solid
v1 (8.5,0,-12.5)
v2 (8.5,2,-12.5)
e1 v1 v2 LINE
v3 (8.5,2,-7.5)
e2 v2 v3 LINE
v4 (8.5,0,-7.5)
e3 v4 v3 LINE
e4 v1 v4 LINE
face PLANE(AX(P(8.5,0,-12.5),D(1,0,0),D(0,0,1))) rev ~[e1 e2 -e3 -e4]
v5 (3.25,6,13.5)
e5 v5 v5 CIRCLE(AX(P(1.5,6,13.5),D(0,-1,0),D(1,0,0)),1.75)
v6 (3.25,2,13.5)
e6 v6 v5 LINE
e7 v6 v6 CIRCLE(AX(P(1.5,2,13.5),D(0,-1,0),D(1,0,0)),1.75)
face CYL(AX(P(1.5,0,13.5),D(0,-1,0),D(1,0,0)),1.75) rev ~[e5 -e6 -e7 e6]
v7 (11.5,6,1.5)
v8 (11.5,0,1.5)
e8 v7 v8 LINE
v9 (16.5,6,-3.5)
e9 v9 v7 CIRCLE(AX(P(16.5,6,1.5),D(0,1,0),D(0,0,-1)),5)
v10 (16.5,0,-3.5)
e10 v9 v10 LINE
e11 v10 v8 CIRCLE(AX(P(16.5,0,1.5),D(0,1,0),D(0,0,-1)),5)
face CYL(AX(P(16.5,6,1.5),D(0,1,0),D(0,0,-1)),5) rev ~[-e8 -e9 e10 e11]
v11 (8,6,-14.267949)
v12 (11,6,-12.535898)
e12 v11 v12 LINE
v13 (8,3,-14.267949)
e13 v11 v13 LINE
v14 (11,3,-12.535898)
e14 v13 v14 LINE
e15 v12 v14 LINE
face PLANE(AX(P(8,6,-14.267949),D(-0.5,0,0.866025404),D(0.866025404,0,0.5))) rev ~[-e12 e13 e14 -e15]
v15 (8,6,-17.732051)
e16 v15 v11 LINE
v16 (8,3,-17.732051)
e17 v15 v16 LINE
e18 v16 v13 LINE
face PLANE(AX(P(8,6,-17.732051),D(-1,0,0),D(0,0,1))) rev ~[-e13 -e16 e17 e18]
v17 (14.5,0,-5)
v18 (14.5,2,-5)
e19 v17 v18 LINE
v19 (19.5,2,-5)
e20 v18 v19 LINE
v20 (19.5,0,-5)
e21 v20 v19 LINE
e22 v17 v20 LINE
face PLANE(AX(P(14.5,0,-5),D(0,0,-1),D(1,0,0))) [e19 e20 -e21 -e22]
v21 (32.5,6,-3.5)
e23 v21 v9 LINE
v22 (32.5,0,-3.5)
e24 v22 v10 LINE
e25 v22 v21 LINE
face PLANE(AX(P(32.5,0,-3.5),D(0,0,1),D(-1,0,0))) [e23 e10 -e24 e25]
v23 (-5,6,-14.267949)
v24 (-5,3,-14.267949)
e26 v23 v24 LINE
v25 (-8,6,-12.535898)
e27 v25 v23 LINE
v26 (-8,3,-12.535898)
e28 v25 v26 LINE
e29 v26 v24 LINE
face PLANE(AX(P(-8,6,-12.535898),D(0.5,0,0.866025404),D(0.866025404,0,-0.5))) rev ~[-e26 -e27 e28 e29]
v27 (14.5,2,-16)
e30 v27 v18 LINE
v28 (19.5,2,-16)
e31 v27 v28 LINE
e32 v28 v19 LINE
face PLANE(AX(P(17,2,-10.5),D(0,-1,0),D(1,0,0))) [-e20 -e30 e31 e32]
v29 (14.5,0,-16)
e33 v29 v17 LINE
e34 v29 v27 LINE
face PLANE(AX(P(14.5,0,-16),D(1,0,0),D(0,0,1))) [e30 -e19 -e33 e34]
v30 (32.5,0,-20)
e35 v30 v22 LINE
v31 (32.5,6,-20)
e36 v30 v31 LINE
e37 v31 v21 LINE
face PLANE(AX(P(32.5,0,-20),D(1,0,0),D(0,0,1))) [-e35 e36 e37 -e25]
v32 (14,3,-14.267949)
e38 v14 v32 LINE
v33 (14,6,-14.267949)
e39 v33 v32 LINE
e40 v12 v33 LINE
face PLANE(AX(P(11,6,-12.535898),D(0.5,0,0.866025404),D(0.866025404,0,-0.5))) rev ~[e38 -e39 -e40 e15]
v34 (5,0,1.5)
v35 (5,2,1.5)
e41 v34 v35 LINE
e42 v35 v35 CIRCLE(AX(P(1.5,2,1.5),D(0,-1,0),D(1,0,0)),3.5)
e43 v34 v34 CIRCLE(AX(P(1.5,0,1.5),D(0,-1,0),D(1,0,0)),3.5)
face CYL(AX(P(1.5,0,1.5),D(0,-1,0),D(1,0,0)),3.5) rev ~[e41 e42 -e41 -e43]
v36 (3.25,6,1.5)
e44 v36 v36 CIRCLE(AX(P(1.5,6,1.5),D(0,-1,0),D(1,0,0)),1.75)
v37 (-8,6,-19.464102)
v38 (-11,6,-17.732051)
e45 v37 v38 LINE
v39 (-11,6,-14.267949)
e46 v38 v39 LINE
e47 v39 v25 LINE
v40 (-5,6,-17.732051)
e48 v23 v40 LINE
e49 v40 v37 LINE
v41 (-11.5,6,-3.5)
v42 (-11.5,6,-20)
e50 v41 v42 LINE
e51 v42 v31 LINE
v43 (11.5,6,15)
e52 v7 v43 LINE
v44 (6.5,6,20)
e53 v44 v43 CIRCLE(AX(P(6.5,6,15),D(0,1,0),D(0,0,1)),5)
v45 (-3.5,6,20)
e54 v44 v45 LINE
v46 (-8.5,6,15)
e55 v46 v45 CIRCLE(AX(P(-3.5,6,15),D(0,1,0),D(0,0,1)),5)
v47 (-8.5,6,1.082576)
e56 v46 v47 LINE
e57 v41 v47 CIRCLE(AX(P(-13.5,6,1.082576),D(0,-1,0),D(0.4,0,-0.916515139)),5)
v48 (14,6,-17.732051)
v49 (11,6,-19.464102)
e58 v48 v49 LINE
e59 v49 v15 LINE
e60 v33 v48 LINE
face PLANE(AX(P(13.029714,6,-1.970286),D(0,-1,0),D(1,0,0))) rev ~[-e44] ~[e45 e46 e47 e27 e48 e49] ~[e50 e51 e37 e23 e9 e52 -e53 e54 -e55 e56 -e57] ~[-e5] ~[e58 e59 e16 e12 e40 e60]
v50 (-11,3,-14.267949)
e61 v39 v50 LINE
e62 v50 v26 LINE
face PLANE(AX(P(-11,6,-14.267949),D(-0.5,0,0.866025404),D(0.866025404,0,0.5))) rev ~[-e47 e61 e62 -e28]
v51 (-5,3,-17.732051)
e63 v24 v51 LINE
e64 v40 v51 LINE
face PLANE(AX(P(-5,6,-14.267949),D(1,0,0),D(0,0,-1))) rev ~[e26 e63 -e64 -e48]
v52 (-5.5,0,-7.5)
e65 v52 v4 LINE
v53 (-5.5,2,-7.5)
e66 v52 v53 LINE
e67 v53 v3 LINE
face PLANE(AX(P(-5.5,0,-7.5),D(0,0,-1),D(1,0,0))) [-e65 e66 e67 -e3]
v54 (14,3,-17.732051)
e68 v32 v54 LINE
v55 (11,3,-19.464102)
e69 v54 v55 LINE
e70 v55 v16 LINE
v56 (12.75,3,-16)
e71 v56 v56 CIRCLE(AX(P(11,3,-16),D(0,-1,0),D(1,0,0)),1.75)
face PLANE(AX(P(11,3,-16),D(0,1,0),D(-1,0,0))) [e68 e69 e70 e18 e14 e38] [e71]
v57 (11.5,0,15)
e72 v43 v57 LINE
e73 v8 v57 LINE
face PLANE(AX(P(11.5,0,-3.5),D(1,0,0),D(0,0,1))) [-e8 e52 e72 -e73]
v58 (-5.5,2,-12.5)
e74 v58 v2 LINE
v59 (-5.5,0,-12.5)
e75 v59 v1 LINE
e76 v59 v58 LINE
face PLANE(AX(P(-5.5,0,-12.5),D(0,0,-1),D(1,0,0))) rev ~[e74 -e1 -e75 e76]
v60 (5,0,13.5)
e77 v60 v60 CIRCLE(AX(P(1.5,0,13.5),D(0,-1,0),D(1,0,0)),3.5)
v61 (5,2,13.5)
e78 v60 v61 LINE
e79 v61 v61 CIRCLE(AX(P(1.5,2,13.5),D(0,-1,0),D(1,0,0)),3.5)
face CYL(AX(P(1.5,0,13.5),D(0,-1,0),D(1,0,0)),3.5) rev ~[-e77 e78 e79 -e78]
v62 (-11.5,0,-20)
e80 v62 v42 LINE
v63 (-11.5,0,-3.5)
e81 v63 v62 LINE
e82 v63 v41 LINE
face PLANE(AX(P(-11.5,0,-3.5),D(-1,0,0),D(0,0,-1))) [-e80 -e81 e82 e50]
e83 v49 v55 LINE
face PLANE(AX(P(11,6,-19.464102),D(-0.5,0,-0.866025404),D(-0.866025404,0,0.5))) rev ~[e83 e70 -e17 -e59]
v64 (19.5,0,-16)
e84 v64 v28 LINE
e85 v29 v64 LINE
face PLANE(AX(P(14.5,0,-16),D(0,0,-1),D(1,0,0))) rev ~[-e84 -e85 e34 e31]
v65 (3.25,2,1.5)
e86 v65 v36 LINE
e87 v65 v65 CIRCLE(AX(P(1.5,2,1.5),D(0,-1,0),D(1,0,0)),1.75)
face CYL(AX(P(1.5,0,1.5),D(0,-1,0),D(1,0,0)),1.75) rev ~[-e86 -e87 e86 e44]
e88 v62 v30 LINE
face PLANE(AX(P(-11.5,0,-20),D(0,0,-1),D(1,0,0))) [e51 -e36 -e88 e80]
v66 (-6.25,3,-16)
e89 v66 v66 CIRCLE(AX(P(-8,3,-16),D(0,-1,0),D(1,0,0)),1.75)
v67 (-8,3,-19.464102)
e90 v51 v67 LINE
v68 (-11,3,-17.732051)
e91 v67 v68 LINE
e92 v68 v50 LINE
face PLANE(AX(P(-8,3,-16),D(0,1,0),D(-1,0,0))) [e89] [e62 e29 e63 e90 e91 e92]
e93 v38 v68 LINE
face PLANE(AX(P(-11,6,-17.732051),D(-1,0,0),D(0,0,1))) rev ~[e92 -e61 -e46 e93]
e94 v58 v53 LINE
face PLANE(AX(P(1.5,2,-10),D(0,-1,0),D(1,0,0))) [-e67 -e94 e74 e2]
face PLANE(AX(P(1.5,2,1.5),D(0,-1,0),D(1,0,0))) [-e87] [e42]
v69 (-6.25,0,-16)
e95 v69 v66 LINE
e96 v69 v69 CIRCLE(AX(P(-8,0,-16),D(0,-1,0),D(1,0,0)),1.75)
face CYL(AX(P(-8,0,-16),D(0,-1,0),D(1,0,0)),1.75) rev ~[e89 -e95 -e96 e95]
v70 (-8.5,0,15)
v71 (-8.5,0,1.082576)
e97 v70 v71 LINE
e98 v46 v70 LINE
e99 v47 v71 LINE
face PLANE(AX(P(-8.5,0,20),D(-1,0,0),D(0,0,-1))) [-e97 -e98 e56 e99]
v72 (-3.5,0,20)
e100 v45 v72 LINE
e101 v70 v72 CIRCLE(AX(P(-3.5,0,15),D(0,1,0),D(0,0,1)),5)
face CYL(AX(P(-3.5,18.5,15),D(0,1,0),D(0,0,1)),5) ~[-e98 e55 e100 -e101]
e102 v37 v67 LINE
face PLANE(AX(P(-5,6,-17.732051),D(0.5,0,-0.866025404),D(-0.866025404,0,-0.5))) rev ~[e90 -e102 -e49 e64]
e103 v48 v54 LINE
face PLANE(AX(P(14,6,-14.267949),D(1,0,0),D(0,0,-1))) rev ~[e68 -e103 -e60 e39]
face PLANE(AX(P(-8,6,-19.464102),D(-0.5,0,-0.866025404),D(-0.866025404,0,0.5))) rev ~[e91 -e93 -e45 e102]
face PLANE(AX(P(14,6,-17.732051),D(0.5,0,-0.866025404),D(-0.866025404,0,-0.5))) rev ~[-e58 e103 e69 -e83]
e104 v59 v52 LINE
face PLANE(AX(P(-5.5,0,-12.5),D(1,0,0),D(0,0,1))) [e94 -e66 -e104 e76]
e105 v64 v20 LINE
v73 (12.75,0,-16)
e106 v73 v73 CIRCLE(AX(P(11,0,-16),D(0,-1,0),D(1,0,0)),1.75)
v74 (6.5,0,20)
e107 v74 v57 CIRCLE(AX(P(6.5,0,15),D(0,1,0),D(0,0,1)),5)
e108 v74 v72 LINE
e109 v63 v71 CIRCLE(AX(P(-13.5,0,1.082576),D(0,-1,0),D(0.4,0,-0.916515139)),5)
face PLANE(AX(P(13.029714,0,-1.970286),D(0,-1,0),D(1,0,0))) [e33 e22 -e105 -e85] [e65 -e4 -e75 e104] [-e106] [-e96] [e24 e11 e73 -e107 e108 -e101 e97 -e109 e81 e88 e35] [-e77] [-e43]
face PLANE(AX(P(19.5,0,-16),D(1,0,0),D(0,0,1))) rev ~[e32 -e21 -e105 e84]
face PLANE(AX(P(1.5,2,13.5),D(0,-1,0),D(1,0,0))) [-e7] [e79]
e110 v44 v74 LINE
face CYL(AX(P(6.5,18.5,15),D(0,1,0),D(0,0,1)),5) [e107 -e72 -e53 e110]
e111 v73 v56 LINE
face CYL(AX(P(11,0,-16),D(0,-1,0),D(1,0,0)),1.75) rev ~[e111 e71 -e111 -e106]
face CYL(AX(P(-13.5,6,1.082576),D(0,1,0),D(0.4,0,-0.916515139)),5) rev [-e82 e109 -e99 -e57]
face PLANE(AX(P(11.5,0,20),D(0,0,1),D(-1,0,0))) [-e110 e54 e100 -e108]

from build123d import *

# Parameters (mm, degrees)
F0_R        = 1.75
F0_W        = 14
F0_H        = 5
F0_W_2      = 5
F0_H_2      = 11
F0_R_2      = 3.5
F1_DEPTH    = 6
F2_DEPTH    = 2
F4_DEPTH    = 3
F5_T1_DEPTH = 6
F5_T3_DEPTH = 6
F5_T5_DEPTH = 31
F5_T7_DEPTH = 31


# Not quite as in the source:
# - a fillet or chamfer that OpenCascade refuses, or shapes differently, is made with other operations: its cross-section is extruded or revolved along the edge and cut away or added


with BuildPart() as f1:
    # F0 (on Front) → F1 (new body)
    with BuildSketch(Plane.XZ):
        Polygon((-11.5, -20), (32.5, -20), (32.5, -3.5), (11.5, -3.5), (11.5, 20), (-8.5, 20), (-8.5, -3.5), (-11.5, -3.5), align=None)
        with Locations((-8, -16)):
            Circle(F0_R, mode=Mode.SUBTRACT)
        with Locations((1.5, -10)):
            Rectangle(F0_W, F0_H, mode=Mode.SUBTRACT)
        with Locations((11, -16)):
            Circle(F0_R, mode=Mode.SUBTRACT)
        with Locations((17, -10.5)):
            Rectangle(F0_W_2, F0_H_2, mode=Mode.SUBTRACT)
        with Locations((1.5, 1.5)):
            Circle(F0_R_2, mode=Mode.SUBTRACT)
        with Locations((1.5, 13.5)):
            Circle(F0_R_2, mode=Mode.SUBTRACT)
        with Locations((1.5, -10)):
            Rectangle(F0_W, F0_H)
        with Locations((17, -10.5)):
            Rectangle(F0_W_2, F0_H_2)
        with Locations((1.5, 1.5)):
            Circle(F0_R_2)
        with Locations((1.5, 1.5)):
            Circle(F0_R, mode=Mode.SUBTRACT)
        with Locations((1.5, 13.5)):
            Circle(F0_R_2)
        with Locations((1.5, 13.5)):
            Circle(F0_R, mode=Mode.SUBTRACT)
    extrude(amount=-F1_DEPTH)

    # F0 (on Front) → F2 (cut)
    with BuildSketch(Plane.XZ):
        with Locations((17, -10.5)):
            Rectangle(F0_W_2, F0_H_2)
        with Locations((1.5, -10)):
            Rectangle(F0_W, F0_H)
        with Locations((1.5, 13.5)):
            Circle(F0_R_2)
        with Locations((1.5, 13.5)):
            Circle(F0_R, mode=Mode.SUBTRACT)
        with Locations((1.5, 1.5)):
            Circle(F0_R_2)
        with Locations((1.5, 1.5)):
            Circle(F0_R, mode=Mode.SUBTRACT)
    extrude(amount=-F2_DEPTH, mode=Mode.SUBTRACT)

    # F3 (on face) → F4 (cut)
    with BuildSketch(Plane(origin=(0, 6, 0), x_dir=(-1, 0, 0), z_dir=(0, 1, 0))):
        Polygon((-11, -12.5358983849), (-14, -14.2679491924), (-14, -17.7320508076), (-11, -19.4641016151), (-8, -17.7320508076), (-8, -14.2679491924), align=None)
        Polygon((5, -14.2679491924), (5, -17.7320508076), (8, -19.4641016151), (11, -17.7320508076), (11, -14.2679491924), (8, -12.5358983849), align=None)
    extrude(amount=-F4_DEPTH, mode=Mode.SUBTRACT)

    # F5: fillet of radius 5 on 4 edges, made by hand

    # F5_s2 → F5_t1 (join)
    with BuildSketch(Plane.XZ.offset(-6)):
        with BuildLine():
            ThreePointArc((-11.5, -3.5), (-9.3166998673, -1.6560370926), (-8.5, 1.082575695))
            Line((-8.5, 1.082575695), (-8.5, -3.5))
            Line((-8.5, -3.5), (-11.5, -3.5))
        make_face()
    extrude(amount=F5_T1_DEPTH)

    # F5_s4 → F5_t3 (join)
    with BuildSketch(Plane.XZ.offset(-6)):
        with BuildLine():
            ThreePointArc((16.5, -3.5), (12.9644660941, -2.0355339059), (11.5, 1.5))
            Line((11.5, 1.5), (11.5, -3.5))
            Line((11.5, -3.5), (16.5, -3.5))
        make_face()
    extrude(amount=F5_T3_DEPTH)

    # F5_s6 → F5_t5 (cut)
    with BuildSketch(Plane.XZ.offset(-18.5)):
        with BuildLine():
            ThreePointArc((-3.5, 20), (-7.0355339059, 18.5355339059), (-8.5, 15))
            Line((-8.5, 15), (-8.5, 20))
            Line((-8.5, 20), (-3.5, 20))
        make_face()
    extrude(amount=F5_T5_DEPTH, mode=Mode.SUBTRACT)

    # F5_s8 → F5_t7 (cut)
    with BuildSketch(Plane.XZ.offset(-18.5)):
        with BuildLine():
            ThreePointArc((6.5, 20), (10.0355339059, 18.5355339059), (11.5, 15))
            Line((11.5, 15), (11.5, 20))
            Line((11.5, 20), (6.5, 20))
        make_face()
    extrude(amount=F5_T7_DEPTH, mode=Mode.SUBTRACT)


solid = f1.part
